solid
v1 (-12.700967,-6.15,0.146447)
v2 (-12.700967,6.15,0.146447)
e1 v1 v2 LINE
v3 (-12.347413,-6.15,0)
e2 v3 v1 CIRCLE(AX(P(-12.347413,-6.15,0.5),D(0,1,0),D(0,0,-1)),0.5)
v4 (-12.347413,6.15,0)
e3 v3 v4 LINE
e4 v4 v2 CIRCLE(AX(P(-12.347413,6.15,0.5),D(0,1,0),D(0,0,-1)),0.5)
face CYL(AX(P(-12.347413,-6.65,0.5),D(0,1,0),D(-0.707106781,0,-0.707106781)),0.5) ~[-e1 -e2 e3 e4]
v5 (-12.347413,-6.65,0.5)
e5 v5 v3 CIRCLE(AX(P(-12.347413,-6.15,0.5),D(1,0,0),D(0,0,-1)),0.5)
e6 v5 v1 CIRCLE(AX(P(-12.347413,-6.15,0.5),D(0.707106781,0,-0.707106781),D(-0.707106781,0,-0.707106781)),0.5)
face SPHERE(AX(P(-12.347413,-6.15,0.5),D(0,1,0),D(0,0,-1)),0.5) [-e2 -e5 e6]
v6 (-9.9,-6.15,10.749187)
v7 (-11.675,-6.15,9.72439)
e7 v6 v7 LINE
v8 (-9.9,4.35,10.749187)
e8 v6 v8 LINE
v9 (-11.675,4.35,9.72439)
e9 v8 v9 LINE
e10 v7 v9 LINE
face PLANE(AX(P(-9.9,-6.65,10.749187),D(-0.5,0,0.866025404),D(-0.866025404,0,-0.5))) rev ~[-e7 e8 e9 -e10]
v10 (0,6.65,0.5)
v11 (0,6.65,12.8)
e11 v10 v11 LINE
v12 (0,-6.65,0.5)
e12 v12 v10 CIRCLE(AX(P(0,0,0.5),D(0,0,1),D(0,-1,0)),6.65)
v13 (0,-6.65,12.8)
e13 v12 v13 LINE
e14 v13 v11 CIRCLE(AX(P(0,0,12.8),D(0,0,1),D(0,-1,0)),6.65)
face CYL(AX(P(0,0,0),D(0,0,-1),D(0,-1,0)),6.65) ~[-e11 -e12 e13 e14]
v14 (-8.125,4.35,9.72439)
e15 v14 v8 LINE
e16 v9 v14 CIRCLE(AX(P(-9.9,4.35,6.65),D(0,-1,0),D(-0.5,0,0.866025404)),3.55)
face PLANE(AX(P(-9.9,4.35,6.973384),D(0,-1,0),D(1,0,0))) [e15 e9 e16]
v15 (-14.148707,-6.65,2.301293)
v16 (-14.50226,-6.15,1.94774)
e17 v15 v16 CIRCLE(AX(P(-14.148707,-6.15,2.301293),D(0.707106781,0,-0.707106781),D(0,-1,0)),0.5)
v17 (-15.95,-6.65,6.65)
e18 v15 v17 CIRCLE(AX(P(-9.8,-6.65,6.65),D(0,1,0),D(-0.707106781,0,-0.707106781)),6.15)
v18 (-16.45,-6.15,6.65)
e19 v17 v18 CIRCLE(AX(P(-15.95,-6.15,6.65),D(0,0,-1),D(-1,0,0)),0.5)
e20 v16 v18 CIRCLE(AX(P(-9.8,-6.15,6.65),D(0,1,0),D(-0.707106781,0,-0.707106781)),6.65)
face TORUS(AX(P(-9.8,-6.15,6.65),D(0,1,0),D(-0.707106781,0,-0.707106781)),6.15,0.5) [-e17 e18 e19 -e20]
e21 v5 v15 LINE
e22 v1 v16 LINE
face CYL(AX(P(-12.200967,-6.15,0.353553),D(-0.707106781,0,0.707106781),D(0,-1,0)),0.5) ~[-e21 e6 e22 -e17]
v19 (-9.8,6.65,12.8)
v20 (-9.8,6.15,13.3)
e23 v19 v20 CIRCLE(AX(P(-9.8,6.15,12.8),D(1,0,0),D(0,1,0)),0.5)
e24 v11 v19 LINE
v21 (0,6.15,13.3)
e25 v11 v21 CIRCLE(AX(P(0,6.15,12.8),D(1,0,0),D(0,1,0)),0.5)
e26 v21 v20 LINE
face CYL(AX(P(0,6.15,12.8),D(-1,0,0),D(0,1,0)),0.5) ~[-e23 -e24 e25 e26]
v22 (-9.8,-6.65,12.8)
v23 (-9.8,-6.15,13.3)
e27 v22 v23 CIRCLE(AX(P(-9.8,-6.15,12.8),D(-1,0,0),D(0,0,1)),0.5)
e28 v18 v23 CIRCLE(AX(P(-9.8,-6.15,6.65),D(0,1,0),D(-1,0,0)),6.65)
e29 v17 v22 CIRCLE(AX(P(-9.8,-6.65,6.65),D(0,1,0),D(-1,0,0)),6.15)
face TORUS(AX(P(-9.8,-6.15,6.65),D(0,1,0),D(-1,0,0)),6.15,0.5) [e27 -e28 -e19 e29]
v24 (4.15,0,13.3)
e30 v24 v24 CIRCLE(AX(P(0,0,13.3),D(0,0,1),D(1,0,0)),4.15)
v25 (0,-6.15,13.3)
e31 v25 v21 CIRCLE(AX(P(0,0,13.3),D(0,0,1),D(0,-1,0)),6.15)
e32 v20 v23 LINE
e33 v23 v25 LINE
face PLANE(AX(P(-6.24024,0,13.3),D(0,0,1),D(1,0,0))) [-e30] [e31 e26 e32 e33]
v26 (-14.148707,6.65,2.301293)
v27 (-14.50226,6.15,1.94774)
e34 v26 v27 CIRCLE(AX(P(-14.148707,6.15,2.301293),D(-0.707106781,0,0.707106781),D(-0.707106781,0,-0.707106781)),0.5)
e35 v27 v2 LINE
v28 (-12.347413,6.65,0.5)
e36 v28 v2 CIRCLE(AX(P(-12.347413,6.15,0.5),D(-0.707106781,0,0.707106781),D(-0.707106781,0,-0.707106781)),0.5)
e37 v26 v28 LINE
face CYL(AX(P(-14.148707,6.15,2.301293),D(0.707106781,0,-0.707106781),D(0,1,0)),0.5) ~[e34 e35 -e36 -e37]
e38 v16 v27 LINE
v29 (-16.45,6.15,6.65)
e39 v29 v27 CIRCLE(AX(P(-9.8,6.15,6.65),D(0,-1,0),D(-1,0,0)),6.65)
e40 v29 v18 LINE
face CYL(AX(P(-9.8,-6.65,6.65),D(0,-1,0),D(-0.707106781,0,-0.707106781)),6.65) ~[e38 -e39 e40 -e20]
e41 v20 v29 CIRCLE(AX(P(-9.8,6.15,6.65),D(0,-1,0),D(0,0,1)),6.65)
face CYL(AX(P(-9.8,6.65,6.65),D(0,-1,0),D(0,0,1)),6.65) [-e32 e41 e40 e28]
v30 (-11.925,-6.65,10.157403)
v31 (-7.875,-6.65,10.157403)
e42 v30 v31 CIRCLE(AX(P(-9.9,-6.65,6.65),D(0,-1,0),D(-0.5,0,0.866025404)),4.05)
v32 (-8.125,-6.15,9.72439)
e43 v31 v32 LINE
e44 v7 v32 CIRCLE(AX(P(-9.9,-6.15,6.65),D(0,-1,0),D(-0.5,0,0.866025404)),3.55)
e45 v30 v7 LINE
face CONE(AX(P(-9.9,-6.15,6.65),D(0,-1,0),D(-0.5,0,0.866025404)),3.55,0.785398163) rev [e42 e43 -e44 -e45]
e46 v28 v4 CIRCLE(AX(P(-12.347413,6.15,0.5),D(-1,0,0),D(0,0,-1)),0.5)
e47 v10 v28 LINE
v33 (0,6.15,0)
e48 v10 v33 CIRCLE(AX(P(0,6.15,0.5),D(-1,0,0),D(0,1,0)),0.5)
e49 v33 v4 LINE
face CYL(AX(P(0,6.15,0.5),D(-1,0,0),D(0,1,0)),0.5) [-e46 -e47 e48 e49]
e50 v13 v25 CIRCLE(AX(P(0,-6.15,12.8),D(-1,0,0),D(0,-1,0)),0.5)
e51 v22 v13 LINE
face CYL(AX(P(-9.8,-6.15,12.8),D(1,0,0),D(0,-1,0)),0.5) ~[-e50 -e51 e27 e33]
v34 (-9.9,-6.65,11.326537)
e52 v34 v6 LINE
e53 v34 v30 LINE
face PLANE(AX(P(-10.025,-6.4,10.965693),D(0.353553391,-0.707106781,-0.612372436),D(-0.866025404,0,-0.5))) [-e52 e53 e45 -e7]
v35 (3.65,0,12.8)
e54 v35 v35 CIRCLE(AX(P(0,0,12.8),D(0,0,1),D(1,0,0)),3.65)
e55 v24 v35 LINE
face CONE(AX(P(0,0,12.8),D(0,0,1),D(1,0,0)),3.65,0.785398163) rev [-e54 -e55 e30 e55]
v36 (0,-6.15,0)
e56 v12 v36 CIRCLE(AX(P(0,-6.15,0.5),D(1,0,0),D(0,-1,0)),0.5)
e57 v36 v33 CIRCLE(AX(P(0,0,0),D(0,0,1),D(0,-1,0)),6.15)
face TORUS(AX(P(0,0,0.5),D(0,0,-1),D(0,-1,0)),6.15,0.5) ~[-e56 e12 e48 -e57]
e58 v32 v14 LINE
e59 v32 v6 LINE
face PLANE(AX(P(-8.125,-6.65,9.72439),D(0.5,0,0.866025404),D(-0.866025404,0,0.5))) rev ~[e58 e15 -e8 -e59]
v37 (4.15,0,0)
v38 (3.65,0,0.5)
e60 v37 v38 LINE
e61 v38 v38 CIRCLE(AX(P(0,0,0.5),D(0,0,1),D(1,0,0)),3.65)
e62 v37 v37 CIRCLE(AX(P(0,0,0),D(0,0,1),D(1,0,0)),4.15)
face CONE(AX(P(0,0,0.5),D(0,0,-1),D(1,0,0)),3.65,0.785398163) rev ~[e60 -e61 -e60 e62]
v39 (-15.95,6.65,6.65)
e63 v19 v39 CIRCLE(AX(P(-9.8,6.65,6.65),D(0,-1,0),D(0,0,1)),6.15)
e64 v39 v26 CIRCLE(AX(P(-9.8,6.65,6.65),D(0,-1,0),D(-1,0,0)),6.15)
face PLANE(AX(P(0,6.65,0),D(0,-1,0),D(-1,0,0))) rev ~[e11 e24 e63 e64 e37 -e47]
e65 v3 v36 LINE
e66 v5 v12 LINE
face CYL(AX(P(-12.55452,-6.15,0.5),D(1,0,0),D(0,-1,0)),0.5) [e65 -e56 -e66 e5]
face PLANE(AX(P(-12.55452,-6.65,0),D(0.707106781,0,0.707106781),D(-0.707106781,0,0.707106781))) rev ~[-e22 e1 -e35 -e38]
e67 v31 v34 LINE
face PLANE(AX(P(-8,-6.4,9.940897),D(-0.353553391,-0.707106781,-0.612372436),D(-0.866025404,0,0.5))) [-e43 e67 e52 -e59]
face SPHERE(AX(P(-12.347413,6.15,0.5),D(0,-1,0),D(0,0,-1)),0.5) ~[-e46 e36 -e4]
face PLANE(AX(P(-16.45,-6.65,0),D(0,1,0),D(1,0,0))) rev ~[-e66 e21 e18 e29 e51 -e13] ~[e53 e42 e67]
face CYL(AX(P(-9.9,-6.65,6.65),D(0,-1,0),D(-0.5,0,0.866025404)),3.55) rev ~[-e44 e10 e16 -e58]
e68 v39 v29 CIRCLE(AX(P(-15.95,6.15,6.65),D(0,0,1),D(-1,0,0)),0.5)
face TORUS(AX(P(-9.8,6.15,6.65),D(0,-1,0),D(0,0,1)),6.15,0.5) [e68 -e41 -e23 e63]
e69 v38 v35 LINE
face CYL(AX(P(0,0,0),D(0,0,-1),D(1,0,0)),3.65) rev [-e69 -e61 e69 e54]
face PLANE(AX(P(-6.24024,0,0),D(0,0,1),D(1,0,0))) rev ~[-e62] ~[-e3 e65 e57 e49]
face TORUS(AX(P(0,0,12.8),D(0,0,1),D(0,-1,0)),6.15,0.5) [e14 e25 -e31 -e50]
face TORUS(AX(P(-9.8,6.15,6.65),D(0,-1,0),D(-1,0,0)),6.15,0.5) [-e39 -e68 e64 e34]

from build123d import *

# Parameters (mm, degrees)
F0_R     = 3.65
F1_DEPTH = 13.3
F3_DEPTH = 11
F4_R     = 6.65
F6_DEPTH = 25
F7_R     = 0.5
F8_SIZE  = 0.5


with BuildPart() as f1:
    # F0 (on Top) → F1 (new body)
    with BuildSketch(Plane.XY):
        with BuildLine():
            ThreePointArc((0, -6.65), (6.65, 0), (0, 6.65))
            Line((0, 6.65), (-16.45, 6.65))
            Line((-16.45, 6.65), (-16.45, -6.65))
            Line((-16.45, -6.65), (0, -6.65))
        make_face()
        with Locations((-9.8, 0)):
            Circle(F0_R, mode=Mode.SUBTRACT)
        Circle(F0_R, mode=Mode.SUBTRACT)
        with Locations((-9.8, 0)):
            Circle(F0_R)
    extrude(amount=F1_DEPTH)

    # F2 (on face) → F3 (cut)
    with BuildSketch(Plane.XZ.offset(6.65)):
        with BuildLine():
            Line((-9.9, 10.7491869112), (-11.675, 9.7243901834))
            ThreePointArc((-11.675, 9.7243901834), (-9.9, 3.1), (-8.125, 9.7243901834))
            Line((-8.125, 9.7243901834), (-9.9, 10.7491869112))
        make_face()
    extrude(amount=-F3_DEPTH, mode=Mode.SUBTRACT)

    # F4
    f4_edges = [f1.edges().sort_by_distance(p)[0] for p in [
        (-16.45, 0, 13.3),
    ]]
    fillet(f4_edges, radius=F4_R)

    # F5 (on face) → F6 (cut)
    with BuildSketch(Plane.XZ.offset(6.65)):
        with BuildLine():
            Line((-16.45, 0), (-12.5545201898, 0))
            Line((-12.5545201898, 0), (-14.5022600949, 1.9477399051))
            ThreePointArc((-14.5022600949, 1.9477399051), (-15.9437988912, 4.1051551748), (-16.45, 6.65))
            Line((-16.45, 6.65), (-16.45, 0))
        make_face()
    extrude(amount=-F6_DEPTH, mode=Mode.SUBTRACT)

    # F7
    f7_edges = [f1.edges().sort_by_distance(p)[0] for p in [
        (-4.9, -6.65, 13.3),
        (6.65, 0, 13.3),
        (-4.9, 6.65, 13.3),
        (-15.943799, 6.65, 9.194845),
        (-12.55452, 0, 0),
        (-13.52839, -6.65, 0.97387),
        (-6.27726, -6.65, 0),
        (6.65, 0, 0),
        (-15.943799, -6.65, 9.194845),
        (-6.27726, 6.65, 0),
        (-13.52839, 6.65, 0.97387),
    ]]
    fillet(f7_edges, radius=F7_R)

    # F8
    f8_edges = [f1.edges().sort_by_distance(p)[0] for p in [
        (-9.9, -6.65, 3.1),
        (-3.65, 0, 13.3),
        (-3.65, 0, 0),
        (-9.0125, -6.65, 10.236789),
        (-10.7875, -6.65, 10.236789),
    ]]
    chamfer(f8_edges, length=F8_SIZE)


solid = f1.part
